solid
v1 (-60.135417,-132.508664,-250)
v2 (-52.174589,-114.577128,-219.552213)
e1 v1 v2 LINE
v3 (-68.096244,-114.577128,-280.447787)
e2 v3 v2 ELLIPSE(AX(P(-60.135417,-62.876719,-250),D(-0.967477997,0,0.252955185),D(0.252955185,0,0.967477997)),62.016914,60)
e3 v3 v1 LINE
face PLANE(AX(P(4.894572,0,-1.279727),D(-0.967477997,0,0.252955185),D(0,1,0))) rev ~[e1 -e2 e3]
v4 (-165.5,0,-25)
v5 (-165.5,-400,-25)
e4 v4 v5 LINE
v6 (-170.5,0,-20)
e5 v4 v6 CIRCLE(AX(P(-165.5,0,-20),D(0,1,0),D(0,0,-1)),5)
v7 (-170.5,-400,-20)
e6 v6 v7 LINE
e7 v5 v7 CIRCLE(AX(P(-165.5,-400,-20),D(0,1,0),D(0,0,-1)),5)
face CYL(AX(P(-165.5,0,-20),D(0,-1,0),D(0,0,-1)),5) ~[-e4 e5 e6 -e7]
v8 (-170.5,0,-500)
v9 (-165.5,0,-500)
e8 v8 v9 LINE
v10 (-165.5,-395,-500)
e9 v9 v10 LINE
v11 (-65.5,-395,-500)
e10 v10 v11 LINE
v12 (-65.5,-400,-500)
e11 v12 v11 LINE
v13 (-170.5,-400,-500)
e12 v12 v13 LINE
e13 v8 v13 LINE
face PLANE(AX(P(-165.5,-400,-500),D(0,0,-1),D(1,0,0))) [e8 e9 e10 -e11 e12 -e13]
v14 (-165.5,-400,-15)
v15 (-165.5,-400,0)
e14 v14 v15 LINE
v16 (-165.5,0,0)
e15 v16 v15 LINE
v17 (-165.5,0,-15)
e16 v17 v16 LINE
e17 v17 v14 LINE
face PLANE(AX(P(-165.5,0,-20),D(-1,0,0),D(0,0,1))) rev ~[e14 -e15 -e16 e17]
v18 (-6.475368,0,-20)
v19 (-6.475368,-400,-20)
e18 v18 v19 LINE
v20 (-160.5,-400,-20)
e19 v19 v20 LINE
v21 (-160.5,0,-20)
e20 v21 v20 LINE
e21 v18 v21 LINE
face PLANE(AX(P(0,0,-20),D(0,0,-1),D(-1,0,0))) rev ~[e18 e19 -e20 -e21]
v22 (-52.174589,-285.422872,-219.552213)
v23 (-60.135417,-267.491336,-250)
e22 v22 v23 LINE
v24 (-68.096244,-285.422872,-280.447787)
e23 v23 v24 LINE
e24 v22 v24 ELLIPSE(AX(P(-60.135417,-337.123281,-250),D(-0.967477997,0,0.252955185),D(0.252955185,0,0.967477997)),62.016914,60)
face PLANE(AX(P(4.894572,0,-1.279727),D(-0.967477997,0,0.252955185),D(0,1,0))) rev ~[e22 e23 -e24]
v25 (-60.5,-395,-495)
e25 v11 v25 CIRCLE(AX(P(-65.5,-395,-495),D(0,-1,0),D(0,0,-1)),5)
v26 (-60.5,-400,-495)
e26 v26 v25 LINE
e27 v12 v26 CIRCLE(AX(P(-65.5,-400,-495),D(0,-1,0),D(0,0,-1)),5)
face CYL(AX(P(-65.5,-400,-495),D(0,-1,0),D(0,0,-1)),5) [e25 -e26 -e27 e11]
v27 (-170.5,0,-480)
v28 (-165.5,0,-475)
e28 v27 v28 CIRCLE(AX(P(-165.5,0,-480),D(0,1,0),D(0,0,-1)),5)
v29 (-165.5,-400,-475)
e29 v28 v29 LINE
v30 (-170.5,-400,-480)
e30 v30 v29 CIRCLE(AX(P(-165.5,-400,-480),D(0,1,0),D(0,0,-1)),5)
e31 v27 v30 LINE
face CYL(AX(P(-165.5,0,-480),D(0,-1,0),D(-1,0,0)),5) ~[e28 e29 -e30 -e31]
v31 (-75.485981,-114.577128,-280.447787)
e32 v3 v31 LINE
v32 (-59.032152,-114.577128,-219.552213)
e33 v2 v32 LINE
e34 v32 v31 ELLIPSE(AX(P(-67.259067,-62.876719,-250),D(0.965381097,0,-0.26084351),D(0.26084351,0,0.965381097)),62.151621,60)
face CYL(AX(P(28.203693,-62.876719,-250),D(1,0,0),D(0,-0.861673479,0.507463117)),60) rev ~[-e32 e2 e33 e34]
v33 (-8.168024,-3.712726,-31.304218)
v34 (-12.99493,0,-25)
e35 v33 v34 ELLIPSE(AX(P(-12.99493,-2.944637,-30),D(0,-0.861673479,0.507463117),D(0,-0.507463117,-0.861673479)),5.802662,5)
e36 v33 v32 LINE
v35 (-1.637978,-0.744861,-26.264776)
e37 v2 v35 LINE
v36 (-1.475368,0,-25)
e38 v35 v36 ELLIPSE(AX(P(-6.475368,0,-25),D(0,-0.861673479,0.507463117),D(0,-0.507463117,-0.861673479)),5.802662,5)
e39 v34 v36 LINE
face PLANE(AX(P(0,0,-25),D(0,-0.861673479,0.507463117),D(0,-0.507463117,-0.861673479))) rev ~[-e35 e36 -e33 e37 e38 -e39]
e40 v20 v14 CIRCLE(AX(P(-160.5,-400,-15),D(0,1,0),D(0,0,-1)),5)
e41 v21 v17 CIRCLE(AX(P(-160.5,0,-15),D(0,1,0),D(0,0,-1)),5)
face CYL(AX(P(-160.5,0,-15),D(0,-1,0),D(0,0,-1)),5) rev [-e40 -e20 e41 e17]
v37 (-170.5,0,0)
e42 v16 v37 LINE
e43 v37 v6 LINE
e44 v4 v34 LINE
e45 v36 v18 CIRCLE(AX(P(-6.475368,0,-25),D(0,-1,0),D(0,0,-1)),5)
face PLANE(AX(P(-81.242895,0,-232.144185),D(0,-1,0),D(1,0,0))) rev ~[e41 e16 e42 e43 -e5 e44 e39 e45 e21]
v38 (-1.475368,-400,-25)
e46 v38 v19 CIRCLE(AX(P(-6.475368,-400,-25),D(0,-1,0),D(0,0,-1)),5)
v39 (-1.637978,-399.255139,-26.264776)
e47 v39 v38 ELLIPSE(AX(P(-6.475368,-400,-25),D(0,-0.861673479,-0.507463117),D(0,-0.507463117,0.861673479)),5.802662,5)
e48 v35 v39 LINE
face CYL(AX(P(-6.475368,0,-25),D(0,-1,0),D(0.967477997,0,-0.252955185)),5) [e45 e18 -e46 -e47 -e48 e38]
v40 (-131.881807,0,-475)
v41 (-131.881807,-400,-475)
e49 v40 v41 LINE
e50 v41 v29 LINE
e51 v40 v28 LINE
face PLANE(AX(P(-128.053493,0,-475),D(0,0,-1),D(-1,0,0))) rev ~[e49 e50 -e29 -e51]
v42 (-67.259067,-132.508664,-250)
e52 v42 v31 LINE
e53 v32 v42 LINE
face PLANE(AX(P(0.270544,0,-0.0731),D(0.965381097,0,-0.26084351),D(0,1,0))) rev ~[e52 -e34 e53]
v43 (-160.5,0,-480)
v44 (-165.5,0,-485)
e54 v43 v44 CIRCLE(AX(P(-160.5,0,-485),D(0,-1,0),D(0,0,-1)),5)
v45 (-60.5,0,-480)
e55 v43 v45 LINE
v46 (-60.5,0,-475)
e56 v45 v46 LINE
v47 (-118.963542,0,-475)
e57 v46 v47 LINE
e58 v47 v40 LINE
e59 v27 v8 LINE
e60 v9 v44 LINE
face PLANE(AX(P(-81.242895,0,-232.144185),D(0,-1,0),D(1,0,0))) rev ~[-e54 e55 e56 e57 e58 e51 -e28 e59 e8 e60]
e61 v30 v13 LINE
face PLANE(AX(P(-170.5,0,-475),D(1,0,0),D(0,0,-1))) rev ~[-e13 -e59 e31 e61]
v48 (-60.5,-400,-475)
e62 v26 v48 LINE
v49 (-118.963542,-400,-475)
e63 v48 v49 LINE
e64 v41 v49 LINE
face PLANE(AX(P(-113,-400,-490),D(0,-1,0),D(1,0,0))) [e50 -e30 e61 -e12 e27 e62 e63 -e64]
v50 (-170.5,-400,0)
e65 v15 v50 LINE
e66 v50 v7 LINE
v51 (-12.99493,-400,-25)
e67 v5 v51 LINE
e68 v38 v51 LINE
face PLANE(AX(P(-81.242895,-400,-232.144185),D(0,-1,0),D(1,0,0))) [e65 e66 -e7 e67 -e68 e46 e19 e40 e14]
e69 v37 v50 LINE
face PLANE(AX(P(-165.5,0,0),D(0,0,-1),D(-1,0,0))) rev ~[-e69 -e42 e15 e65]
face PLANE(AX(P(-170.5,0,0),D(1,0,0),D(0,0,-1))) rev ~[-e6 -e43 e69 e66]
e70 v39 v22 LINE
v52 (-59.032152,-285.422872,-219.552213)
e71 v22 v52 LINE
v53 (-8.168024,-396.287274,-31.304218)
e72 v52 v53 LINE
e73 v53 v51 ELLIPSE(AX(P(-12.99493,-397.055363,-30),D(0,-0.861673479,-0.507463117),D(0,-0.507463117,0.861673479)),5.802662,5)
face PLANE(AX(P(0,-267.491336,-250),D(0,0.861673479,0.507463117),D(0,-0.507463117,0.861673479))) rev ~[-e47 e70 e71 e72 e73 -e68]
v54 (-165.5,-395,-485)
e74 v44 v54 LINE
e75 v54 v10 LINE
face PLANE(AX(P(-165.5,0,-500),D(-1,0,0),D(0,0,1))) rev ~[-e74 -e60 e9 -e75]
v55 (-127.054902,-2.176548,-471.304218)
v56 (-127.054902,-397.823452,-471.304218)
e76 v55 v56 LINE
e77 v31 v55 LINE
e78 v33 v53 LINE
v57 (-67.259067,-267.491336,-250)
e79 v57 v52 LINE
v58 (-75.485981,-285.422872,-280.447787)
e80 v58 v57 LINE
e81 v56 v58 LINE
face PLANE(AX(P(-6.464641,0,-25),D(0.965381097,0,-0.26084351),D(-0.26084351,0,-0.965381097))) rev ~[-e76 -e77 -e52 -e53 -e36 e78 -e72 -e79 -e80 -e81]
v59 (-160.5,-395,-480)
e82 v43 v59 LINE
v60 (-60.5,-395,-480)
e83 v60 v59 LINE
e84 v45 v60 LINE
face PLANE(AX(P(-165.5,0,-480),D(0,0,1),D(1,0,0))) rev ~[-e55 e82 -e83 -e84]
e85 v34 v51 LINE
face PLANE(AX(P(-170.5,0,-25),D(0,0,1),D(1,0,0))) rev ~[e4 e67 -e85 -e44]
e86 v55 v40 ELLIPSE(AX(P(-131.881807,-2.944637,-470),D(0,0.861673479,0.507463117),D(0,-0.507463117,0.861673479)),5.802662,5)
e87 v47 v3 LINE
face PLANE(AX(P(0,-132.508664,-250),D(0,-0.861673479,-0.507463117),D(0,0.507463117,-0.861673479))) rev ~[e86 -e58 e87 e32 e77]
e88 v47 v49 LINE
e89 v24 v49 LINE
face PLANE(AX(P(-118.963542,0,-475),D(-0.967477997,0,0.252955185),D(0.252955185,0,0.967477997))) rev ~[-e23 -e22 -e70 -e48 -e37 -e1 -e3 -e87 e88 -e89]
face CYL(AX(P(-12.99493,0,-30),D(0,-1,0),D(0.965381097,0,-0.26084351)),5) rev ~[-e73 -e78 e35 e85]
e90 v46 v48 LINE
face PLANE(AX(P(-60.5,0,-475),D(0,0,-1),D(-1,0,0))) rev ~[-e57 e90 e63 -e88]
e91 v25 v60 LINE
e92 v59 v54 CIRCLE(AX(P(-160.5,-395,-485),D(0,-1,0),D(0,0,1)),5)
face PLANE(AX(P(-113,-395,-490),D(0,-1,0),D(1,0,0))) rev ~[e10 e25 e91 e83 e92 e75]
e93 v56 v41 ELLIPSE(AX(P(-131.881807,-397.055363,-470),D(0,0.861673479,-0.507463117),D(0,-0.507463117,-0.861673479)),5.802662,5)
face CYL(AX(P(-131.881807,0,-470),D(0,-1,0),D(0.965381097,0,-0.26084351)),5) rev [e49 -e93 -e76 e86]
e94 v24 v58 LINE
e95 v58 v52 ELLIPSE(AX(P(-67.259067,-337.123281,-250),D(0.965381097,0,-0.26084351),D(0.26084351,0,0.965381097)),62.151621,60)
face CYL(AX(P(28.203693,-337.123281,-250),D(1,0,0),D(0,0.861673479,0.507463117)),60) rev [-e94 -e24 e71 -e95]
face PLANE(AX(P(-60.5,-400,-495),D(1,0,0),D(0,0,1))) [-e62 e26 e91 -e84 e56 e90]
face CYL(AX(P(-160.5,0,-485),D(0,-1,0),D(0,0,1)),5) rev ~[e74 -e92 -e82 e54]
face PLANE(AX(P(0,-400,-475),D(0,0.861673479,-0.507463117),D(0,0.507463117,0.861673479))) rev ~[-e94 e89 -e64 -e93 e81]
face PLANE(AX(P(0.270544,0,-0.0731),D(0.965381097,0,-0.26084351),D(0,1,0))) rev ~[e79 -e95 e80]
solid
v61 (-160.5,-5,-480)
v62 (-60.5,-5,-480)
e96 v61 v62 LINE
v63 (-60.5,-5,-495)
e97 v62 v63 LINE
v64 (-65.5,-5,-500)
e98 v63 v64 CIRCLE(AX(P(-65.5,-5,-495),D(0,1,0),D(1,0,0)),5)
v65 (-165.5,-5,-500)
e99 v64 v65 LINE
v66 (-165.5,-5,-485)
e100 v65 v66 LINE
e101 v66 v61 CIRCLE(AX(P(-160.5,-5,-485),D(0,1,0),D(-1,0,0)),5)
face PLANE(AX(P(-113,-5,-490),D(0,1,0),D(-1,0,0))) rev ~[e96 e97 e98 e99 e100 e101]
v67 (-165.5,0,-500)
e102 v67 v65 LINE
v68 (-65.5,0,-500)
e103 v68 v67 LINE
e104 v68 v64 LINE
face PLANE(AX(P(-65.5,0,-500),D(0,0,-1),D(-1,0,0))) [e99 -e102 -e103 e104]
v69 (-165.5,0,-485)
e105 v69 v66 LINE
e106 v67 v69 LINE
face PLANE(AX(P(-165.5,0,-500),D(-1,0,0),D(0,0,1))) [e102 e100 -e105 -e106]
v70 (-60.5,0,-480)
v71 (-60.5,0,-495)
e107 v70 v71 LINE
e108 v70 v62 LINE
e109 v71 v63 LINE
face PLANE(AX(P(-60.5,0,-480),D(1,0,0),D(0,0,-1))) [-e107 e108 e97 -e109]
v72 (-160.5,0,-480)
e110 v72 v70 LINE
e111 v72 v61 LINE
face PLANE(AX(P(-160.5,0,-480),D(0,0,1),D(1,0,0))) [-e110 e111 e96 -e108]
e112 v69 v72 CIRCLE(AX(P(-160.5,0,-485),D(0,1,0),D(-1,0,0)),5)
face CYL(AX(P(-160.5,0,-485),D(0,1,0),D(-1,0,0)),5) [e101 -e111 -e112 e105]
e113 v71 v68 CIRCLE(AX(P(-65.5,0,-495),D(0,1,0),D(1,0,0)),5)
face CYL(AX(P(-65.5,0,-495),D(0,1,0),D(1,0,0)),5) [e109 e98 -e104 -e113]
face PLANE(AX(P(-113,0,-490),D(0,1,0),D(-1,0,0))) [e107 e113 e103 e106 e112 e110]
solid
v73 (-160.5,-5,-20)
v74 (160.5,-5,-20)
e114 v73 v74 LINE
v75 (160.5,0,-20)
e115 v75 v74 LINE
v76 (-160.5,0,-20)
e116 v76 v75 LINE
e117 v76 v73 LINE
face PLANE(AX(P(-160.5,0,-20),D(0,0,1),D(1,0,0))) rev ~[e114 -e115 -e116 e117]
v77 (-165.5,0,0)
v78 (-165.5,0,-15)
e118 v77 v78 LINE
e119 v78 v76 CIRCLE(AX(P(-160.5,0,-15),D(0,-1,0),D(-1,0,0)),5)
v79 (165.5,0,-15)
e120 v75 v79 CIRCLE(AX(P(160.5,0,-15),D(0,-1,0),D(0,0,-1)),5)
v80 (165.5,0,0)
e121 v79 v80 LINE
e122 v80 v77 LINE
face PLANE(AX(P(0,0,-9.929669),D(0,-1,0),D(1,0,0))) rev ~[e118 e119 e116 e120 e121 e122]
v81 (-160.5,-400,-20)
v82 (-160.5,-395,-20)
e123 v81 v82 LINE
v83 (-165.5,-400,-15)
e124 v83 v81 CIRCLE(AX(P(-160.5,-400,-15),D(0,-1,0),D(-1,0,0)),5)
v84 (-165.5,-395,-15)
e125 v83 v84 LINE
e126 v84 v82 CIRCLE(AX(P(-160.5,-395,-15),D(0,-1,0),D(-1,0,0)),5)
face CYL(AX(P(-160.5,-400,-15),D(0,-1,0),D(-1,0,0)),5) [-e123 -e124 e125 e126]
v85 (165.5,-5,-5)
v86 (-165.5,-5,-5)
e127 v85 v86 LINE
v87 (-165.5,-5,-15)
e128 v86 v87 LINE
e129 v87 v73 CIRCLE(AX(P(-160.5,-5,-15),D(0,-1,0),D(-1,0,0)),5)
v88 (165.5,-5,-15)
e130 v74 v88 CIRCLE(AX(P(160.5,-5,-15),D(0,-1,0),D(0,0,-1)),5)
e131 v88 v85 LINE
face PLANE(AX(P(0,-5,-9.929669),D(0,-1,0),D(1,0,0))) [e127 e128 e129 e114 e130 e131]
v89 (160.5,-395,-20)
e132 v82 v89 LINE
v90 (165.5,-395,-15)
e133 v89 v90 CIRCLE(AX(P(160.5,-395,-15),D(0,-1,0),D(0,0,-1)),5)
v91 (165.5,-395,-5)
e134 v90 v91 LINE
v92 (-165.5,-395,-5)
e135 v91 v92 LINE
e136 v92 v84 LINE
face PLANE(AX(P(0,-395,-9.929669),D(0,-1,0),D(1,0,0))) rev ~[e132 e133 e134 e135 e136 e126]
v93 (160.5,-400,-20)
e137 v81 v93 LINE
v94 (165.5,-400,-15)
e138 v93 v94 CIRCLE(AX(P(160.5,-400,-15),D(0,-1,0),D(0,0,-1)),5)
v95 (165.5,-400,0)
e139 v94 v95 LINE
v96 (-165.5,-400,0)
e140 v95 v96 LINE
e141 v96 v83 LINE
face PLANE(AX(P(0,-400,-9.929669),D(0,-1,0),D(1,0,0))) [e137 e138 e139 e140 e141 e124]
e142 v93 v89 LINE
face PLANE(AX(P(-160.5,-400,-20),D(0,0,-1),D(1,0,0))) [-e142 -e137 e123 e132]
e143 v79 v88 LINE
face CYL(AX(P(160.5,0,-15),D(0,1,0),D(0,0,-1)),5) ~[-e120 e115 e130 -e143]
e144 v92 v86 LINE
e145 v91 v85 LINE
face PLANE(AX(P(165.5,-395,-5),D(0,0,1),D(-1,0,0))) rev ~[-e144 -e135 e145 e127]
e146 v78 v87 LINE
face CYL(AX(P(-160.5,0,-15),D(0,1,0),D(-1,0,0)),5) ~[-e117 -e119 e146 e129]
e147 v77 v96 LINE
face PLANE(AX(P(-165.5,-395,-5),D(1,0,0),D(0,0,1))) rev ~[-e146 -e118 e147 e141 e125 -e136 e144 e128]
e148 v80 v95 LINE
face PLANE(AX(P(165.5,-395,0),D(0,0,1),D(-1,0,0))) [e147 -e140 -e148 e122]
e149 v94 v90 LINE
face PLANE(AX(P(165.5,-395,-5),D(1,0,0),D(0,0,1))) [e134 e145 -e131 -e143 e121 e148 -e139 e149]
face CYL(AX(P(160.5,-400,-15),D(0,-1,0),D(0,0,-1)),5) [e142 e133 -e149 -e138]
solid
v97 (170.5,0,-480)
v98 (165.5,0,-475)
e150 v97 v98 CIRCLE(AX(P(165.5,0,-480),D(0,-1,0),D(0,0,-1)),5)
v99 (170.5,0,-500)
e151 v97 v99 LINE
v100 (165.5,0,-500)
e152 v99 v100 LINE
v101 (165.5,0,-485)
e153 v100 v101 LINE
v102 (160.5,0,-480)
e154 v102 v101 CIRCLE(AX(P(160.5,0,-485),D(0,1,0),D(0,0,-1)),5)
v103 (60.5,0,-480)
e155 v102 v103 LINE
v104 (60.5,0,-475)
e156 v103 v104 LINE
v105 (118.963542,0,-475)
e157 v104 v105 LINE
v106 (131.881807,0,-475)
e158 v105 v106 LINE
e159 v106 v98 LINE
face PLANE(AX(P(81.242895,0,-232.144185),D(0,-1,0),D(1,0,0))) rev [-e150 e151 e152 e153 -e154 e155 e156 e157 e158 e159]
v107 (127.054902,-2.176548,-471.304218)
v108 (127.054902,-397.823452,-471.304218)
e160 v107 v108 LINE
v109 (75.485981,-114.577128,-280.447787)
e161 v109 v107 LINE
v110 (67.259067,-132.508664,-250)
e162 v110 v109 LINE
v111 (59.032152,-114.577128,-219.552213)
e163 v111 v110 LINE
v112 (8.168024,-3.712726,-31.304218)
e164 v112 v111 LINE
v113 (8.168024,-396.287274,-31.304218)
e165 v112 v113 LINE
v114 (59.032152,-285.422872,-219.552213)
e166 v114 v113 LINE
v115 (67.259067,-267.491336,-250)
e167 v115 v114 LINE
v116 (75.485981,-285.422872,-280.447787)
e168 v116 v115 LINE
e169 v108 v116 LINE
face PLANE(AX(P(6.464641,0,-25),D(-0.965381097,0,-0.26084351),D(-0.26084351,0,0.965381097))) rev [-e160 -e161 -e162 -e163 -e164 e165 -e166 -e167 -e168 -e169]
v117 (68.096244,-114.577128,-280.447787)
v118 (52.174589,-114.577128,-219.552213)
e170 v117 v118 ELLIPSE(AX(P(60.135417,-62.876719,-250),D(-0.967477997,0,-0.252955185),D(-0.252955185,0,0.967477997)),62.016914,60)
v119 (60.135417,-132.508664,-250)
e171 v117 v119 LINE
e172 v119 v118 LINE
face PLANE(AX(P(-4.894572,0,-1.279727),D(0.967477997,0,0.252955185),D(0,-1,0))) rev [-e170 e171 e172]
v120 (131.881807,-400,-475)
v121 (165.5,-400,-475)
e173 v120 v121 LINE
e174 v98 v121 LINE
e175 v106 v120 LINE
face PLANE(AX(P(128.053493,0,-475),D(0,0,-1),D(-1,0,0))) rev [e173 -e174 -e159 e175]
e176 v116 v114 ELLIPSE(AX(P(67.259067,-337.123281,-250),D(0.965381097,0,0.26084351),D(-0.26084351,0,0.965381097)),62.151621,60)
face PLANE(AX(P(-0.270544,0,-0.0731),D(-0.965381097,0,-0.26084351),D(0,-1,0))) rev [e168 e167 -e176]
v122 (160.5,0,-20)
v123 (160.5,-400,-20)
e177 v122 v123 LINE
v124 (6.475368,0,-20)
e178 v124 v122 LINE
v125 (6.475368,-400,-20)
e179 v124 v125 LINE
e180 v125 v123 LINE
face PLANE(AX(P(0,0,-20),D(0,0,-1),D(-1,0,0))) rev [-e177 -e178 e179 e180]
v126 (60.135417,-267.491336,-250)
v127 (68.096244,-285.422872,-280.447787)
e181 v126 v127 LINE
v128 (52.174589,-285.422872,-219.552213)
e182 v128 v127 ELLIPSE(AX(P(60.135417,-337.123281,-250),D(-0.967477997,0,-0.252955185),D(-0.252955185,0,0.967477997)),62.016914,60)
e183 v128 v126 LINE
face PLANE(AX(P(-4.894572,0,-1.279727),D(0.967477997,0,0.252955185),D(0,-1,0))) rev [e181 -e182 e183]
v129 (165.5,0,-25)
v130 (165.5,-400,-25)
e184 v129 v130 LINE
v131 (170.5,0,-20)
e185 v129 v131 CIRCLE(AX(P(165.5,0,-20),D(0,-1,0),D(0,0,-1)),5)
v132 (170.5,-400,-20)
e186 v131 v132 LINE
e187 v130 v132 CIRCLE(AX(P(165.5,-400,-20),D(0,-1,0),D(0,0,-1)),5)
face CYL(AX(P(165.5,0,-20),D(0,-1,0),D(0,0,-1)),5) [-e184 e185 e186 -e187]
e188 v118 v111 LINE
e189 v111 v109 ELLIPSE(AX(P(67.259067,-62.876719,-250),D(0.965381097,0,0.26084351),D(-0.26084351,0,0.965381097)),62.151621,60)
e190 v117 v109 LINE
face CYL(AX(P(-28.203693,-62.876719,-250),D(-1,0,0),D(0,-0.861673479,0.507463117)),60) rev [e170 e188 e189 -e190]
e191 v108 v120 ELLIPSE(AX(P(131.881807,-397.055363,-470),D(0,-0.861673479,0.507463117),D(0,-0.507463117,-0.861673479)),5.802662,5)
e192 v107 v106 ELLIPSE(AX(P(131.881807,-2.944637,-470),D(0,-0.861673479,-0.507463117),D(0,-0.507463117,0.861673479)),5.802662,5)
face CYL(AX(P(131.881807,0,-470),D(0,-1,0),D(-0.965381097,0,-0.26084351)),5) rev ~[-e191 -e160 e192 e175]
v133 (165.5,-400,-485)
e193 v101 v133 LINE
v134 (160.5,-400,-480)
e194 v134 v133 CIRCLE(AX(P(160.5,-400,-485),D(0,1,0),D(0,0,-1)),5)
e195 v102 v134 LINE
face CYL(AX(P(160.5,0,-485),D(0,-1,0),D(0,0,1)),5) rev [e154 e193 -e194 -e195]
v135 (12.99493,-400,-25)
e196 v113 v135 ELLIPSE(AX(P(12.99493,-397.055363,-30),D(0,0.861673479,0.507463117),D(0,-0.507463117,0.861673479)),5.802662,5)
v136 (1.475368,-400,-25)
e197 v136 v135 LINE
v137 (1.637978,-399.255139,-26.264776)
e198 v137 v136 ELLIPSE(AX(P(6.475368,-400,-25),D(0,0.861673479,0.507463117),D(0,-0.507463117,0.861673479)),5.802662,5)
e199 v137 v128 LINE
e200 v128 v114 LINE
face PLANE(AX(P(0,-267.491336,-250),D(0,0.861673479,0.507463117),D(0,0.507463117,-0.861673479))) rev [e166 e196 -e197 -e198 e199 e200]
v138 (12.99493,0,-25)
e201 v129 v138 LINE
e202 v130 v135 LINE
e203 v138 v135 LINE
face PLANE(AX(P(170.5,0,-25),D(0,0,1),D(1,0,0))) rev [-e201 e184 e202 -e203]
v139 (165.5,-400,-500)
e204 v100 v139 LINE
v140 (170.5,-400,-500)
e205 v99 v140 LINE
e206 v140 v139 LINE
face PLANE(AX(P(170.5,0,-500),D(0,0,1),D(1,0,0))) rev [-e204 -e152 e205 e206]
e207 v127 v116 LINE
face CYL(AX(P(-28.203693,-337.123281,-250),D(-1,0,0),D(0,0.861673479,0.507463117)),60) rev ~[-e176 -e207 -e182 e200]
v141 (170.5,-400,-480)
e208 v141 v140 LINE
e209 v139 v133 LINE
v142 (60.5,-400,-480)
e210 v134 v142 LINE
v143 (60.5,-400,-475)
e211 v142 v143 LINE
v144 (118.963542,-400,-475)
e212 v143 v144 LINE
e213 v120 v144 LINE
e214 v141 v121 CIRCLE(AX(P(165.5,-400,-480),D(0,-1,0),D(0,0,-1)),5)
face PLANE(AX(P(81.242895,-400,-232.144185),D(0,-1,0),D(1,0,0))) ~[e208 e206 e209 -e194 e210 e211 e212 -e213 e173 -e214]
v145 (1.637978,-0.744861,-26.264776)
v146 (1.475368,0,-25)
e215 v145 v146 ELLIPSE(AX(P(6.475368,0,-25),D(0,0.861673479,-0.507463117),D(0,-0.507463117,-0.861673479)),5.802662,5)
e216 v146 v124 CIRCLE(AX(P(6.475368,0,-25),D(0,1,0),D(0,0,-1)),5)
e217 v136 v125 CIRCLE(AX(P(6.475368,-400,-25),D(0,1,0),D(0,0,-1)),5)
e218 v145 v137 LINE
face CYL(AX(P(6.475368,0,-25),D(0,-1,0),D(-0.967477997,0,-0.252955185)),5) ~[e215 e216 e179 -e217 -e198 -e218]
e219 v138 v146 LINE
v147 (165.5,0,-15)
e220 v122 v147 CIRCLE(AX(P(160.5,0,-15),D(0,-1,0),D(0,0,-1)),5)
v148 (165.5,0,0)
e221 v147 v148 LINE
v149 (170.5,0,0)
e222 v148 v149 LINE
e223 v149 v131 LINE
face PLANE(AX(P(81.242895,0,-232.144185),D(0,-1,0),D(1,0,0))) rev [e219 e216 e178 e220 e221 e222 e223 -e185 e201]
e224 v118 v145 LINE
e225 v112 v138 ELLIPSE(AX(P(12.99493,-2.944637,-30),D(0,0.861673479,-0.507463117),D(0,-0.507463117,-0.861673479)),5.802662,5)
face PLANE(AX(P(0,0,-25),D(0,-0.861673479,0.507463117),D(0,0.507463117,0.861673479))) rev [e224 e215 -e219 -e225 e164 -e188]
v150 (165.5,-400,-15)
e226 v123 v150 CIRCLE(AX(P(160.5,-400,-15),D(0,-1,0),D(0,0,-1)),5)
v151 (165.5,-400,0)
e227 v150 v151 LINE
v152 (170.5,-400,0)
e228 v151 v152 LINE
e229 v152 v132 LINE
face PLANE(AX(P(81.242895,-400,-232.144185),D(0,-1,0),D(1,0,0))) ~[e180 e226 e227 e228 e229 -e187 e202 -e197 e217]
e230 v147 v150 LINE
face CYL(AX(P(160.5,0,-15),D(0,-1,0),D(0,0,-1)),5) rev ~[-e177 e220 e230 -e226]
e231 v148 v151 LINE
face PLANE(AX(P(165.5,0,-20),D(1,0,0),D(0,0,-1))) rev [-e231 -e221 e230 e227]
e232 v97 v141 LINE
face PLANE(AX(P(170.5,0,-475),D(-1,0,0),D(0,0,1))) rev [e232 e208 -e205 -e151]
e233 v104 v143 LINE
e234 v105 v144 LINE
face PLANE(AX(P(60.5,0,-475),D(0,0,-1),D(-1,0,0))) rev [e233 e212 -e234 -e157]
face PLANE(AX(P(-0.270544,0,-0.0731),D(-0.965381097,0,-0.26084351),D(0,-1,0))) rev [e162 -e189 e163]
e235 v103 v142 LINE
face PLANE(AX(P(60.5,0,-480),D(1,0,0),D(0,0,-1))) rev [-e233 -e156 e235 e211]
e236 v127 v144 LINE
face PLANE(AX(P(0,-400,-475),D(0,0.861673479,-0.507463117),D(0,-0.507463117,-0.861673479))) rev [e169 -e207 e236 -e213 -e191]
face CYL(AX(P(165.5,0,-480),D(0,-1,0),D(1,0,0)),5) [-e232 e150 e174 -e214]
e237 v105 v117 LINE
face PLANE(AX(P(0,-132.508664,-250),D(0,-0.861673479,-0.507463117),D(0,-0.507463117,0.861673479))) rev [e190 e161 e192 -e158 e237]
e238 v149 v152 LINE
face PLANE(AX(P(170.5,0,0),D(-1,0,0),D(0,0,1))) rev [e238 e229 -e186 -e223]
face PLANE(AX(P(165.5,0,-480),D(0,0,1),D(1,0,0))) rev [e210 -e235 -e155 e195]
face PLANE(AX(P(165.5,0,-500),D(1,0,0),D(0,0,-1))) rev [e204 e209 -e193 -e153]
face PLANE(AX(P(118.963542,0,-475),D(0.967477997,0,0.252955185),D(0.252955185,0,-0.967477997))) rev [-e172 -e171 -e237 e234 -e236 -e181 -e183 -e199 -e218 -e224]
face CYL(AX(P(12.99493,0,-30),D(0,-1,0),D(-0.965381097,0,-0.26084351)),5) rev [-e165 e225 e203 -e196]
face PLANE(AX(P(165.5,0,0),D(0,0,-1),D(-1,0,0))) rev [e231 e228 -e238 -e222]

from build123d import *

# Parameters (mm, degrees)
F2_DEPTH     = 400
F4_DEPTH     = 784
F5_R         = 5
F6_T4_DEPTH  = 183.8018686822
F6_T10_DEPTH = 183.8018686822
F9_DEPTH     = 5
F11_DEPTH    = 5
F13_W        = 331
F13_H        = 5
F14_DEPTH    = 390
F16_DEPTH    = 5
F18_DEPTH    = 5


# Not quite as in the source:
# - a fillet or chamfer that OpenCascade refuses, or shapes differently, is made with other operations: its cross-section is extruded or revolved along the edge and cut away or added


with BuildPart() as f2:
    # F1 (on Front) → F2 (new body)
    with BuildSketch(Plane.XZ):
        Polygon((-118.9635416667, -475), (0, -20), (-165.5, -20), (-165.5, 0), (-170.5, 0), (-170.5, -25), (-6.4646408415, -25), (-128.0534928563, -475), (-170.5, -475), (-170.5, -500), (-165.5, -500), (-165.5, -480), (-60.5, -480), (-60.5, -475), align=None)
    extrude(amount=F2_DEPTH)

    # F3 (on Right) → F4 (cut)
    with BuildSketch(Plane.YZ):
        Polygon((162.0724052191, -25), (0, -25), (-132.508663875, -250), (0, -475), (162.0724052191, -475), align=None)
        Polygon((-267.491336125, -250), (-400, -25), (-562.0724052191, -25), (-562.0724052191, -475), (-400, -475), align=None)
    extrude(amount=-F4_DEPTH, mode=Mode.SUBTRACT)

    # F5
    f5_edges = [f2.edges().sort_by_distance(p)[0] for p in [
        (-6.464641, -200, -25),
        (0, -200, -20),
        (-170.5, -200, -25),
        (-165.5, -200, -20),
        (-128.053493, -200, -475),
        (-170.5, -200, -475),
        (-165.5, -200, -480),
    ]]
    fillet(f5_edges, radius=F5_R)

    # F6: fillet of radius 60 on 2 edges, made by hand


with BuildPart() as f6_tool2:
    # F6_s3 → F6_t4 (new body)
    with BuildSketch(Plane.YZ.offset(28.2036925833)):
        with BuildLine():
            ThreePointArc((-114.5771279689, -219.5522129582), (-122.8767192253, -250), (-114.5771279689, -280.4477870418))
            Line((-114.5771279689, -280.4477870418), (-132.508663875, -250))
            Line((-132.508663875, -250), (-114.5771279689, -219.5522129582))
        make_face()
    extrude(amount=-F6_T4_DEPTH)

    split(bisect_by=Plane(origin=(4.8945715066, 0, -1.2797265085), x_dir=(0, 1, 0), z_dir=(-0.9674779969, 0, 0.2529551846)), keep=Keep.TOP)

    split(bisect_by=Plane(origin=(0.2705438763, 0, -0.0731002652), x_dir=(0, 1, 0), z_dir=(0.9653810975, 0, -0.2608435098)), keep=Keep.TOP)


with BuildPart() as f2_1:
    add(f2.part)

    # F6_t1: union F6_tool2
    add(f6_tool2.part)


with BuildPart() as f6_tool8:
    # F6_s9 → F6_t10 (new body)
    with BuildSketch(Plane.YZ.offset(28.2036925833)):
        with BuildLine():
            ThreePointArc((-285.4228720311, -219.5522129582), (-277.1232807747, -250), (-285.4228720311, -280.4477870418))
            Line((-285.4228720311, -280.4477870418), (-267.491336125, -250))
            Line((-267.491336125, -250), (-285.4228720311, -219.5522129582))
        make_face()
    extrude(amount=-F6_T10_DEPTH)

    split(bisect_by=Plane(origin=(4.8945715066, 0, -1.2797265085), x_dir=(0, 1, 0), z_dir=(-0.9674779969, 0, 0.2529551846)), keep=Keep.TOP)

    split(bisect_by=Plane(origin=(0.2705438763, 0, -0.0731002652), x_dir=(0, 1, 0), z_dir=(0.9653810975, 0, -0.2608435098)), keep=Keep.TOP)


with BuildPart() as f2_2:
    add(f2_1.part)

    # F6_t7: union F6_tool8
    add(f6_tool8.part)


with BuildPart() as f7_1:
    # F7: instance of F2
    add(f2_2.part.mirror(Plane.YZ))


with BuildPart() as f9:
    # F8 (on Front) → F9 (new body)
    with BuildSketch(Plane.XZ):
        with BuildLine():
            Line((165.5, 0), (-165.5, 0))
            Line((-165.5, 0), (-165.5, -15))
            ThreePointArc((-165.5, -15), (-164.0355339059, -18.5355339059), (-160.5, -20))
            Line((-160.5, -20), (-6.4753678563, -20))
            Line((-6.4753678563, -20), (160.5, -20))
            ThreePointArc((160.5, -20), (164.0355339059, -18.5355339059), (165.5, -15))
            Line((165.5, -15), (165.5, 0))
        make_face()
    extrude(amount=F9_DEPTH)



with BuildPart() as f11:
    # F10 (on face) → F11 (new body)
    with BuildSketch(Plane.XZ.offset(400)):
        with BuildLine():
            Line((165.5, 0), (-165.5, 0))
            Line((-165.5, 0), (-165.5, -15))
            ThreePointArc((-165.5, -15), (-164.0355339059, -18.5355339059), (-160.5, -20))
            Line((-160.5, -20), (-6.4753678563, -20))
            Line((-6.4753678563, -20), (160.5, -20))
            ThreePointArc((160.5, -20), (164.0355339059, -18.5355339059), (165.5, -15))
            Line((165.5, -15), (165.5, 0))
        make_face()
    extrude(amount=-F11_DEPTH)


with BuildPart() as f9_1:
    add(f9.part)

    add(f11.part)  # F14 merges F11
    # F13 (on face) → F14 (join, through all)
    with BuildSketch(Plane(origin=(0, -395, 0), x_dir=(-1, 0, 0), z_dir=(0, 1, 0))):
        with Locations((0, -2.5)):
            Rectangle(F13_W, F13_H)
    extrude(amount=F14_DEPTH)


with BuildPart() as f16:
    # F15 (on face) → F16 (new body)
    with BuildSketch(Plane(origin=(0, 0, 0), x_dir=(-1, 0, 0), z_dir=(0, 1, 0))):
        with BuildLine():
            ThreePointArc((165.5, -485), (164.0355339059, -481.4644660941), (160.5, -480))
            Line((160.5, -480), (60.5, -480))
            Line((60.5, -480), (60.5, -495))
            ThreePointArc((60.5, -495), (61.9644660941, -498.5355339059), (65.5, -500))
            Line((65.5, -500), (165.5, -500))
            Line((165.5, -500), (165.5, -485))
        make_face()
    extrude(amount=-F16_DEPTH)


with BuildPart() as f2_3:
    add(f2_2.part)

    # F17 (on face) → F18 (join)
    with BuildSketch(Plane.XZ.offset(400)):
        with BuildLine():
            ThreePointArc((-160.5, -480), (-164.0355339059, -481.4644660941), (-165.5, -485))
            Line((-165.5, -485), (-165.5, -500))
            Line((-165.5, -500), (-65.5, -500))
            ThreePointArc((-65.5, -500), (-61.9644660941, -498.5355339059), (-60.5, -495))
            Line((-60.5, -495), (-60.5, -480))
            Line((-60.5, -480), (-160.5, -480))
        make_face()
    extrude(amount=-F18_DEPTH)


solid = Compound([f7_1.part, f9_1.part, f16.part, f2_3.part])
